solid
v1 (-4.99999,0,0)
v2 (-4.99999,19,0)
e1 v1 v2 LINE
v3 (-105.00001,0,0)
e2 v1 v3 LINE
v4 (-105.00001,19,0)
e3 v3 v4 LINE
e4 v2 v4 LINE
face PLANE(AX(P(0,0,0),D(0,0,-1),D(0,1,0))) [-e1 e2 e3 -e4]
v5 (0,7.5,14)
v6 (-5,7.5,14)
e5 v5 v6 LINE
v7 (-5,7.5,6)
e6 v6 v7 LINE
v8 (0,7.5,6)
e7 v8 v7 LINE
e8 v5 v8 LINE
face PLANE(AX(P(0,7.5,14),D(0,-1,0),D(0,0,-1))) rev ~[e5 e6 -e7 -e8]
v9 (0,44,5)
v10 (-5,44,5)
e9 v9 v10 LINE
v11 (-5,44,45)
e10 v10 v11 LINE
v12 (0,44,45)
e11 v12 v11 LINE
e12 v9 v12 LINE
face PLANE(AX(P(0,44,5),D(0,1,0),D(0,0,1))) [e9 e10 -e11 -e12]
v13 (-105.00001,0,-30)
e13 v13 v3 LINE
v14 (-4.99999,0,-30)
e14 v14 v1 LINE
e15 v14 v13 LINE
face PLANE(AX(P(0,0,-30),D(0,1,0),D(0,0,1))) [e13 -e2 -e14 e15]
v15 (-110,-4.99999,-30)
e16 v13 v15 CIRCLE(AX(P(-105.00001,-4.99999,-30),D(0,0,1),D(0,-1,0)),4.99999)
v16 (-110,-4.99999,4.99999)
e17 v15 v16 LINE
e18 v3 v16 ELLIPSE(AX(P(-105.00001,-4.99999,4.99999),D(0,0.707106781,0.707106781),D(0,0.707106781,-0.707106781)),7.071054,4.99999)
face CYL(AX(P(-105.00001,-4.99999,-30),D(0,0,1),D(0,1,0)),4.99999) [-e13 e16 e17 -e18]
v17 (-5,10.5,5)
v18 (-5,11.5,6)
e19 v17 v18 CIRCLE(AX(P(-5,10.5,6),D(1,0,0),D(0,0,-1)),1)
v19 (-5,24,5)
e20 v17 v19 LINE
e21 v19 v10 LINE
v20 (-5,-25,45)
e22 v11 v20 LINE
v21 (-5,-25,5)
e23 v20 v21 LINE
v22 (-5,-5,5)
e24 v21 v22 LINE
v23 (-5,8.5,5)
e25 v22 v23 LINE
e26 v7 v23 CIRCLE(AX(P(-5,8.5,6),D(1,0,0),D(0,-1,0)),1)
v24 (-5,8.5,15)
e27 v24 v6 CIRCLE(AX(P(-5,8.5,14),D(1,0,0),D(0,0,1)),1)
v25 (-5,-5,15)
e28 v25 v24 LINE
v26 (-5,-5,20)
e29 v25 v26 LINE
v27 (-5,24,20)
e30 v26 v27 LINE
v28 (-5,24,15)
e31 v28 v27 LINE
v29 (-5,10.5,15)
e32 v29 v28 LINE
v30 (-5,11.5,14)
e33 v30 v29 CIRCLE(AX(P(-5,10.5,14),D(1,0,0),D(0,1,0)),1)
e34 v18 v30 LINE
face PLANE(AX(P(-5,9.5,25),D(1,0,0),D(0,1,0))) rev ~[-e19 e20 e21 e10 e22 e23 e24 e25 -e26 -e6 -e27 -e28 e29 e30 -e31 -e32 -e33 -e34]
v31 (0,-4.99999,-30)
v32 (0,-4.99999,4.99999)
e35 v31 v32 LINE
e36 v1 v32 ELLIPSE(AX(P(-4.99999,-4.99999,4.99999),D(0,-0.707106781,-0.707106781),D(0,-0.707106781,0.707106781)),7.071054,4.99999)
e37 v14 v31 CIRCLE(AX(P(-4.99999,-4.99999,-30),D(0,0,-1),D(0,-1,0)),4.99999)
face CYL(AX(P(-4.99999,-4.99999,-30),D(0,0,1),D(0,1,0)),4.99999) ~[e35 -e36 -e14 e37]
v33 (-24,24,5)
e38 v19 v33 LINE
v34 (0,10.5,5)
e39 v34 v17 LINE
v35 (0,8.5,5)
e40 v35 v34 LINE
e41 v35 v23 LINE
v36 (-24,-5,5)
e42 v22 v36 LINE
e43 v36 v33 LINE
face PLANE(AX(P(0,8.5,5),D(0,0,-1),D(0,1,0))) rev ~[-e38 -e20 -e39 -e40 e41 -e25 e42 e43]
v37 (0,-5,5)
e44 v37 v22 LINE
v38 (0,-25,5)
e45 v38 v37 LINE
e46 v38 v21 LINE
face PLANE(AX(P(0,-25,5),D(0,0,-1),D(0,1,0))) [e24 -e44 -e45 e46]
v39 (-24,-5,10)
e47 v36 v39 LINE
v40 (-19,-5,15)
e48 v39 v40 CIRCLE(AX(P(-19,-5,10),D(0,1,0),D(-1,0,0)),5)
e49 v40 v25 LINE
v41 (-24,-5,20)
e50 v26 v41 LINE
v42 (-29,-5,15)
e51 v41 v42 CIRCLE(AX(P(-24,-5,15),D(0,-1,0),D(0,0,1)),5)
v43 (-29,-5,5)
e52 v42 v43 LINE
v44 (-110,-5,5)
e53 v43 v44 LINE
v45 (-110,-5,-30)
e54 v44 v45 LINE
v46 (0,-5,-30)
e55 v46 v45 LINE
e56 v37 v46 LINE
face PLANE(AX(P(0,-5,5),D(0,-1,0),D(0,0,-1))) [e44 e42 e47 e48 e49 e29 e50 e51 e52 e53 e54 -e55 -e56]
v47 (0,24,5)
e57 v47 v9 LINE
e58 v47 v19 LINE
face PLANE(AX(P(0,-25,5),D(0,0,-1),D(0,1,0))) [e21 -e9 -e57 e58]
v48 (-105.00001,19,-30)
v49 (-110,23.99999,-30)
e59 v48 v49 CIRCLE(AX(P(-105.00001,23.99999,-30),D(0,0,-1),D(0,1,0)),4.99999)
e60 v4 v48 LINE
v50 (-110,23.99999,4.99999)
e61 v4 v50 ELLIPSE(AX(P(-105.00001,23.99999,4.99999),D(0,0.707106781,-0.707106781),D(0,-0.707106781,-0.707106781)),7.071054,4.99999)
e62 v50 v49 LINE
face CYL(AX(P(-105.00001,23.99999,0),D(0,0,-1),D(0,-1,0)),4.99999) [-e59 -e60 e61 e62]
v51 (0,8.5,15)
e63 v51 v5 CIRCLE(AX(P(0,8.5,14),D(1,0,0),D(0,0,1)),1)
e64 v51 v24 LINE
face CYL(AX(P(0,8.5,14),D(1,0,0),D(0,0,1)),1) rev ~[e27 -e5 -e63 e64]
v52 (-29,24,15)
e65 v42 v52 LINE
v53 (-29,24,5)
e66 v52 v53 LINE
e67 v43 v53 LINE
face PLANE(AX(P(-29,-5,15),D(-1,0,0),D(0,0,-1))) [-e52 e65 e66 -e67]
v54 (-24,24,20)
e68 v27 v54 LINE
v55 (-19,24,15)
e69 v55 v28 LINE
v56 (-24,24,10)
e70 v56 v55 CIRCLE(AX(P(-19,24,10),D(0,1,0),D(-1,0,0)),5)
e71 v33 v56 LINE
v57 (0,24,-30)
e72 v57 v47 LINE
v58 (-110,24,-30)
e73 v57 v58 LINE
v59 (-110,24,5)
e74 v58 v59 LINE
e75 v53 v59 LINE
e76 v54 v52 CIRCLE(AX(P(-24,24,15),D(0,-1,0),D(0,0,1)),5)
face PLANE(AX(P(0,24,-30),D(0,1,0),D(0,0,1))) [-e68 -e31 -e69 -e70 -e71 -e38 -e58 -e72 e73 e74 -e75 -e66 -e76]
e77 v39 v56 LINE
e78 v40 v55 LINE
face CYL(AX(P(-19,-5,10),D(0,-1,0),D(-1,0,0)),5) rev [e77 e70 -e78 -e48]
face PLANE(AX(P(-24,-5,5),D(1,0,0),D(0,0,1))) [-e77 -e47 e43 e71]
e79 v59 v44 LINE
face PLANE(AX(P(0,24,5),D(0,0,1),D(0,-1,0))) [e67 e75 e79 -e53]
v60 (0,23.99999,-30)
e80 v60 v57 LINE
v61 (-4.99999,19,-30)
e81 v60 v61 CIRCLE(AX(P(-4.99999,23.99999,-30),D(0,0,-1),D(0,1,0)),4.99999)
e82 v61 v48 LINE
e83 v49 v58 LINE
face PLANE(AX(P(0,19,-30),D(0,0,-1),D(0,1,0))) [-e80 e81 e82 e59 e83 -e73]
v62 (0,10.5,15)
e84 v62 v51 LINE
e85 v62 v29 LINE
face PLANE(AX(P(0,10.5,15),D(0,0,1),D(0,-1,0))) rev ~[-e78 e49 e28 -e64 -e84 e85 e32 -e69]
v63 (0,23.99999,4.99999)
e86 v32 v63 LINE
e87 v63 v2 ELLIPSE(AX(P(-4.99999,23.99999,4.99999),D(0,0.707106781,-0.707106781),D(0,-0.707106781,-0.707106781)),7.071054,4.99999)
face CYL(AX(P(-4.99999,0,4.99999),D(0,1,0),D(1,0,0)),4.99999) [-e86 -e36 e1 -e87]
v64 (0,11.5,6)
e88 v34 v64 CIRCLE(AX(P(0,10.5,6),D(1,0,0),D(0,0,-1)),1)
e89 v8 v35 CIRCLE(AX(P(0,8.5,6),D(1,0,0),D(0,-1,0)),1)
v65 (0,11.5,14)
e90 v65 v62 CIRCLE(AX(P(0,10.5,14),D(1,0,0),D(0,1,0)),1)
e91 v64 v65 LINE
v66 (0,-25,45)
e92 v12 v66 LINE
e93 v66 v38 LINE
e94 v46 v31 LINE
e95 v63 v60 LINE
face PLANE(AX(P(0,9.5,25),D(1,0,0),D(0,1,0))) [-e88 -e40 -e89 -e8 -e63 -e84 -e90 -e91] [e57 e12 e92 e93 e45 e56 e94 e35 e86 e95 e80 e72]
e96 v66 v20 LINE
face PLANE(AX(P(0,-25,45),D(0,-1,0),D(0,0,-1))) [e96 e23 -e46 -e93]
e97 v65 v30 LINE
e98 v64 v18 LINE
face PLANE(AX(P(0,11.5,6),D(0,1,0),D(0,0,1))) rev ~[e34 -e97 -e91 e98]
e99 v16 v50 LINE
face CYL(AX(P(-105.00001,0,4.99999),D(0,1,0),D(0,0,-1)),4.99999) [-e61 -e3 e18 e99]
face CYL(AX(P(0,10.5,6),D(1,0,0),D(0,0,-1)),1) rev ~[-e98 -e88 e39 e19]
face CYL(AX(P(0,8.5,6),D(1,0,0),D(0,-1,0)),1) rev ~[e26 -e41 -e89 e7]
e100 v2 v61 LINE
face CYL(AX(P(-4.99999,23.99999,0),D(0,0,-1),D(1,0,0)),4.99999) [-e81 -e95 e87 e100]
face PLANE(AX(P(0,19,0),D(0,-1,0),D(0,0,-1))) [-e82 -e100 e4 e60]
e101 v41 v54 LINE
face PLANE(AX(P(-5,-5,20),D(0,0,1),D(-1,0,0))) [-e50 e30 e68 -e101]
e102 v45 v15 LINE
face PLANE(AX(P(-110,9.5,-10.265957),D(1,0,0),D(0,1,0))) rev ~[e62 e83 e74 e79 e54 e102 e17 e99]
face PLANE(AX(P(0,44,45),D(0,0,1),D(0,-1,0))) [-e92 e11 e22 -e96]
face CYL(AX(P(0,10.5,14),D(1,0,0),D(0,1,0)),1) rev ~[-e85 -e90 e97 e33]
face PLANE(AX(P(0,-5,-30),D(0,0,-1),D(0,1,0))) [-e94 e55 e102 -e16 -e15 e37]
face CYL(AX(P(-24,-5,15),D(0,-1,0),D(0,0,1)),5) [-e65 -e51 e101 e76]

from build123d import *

# Parameters (mm, degrees)
F1_DEPTH = 110
F3_DEPTH = 5
F5_DEPTH = 29
F7_DEPTH = 5
F8_R     = 4.99999
F9_R     = 4.99999


# Not quite as in the source:
# - a fillet or chamfer is up to 0.001 mm smaller than in the source, because OpenCascade refuses the exact size


with BuildPart() as f1:
    # F0 (on Right) → F1 (new body)
    with BuildSketch(Plane.YZ):
        Polygon((-5, -30), (0, -30), (0, 0), (19, 0), (19, -30), (24, -30), (24, 5), (-5, 5), align=None)
    extrude(amount=-F1_DEPTH)

    # F2 (on face) → F3 (join)
    with BuildSketch(Plane.YZ):
        Polygon((-25, 5), (-5, 5), (24, 5), (44, 5), (44, 45), (-25, 45), align=None)
    extrude(amount=-F3_DEPTH)

    # F4 (on face) → F5 (join, through all)
    with BuildSketch(Plane.XZ.offset(5)):
        with BuildLine():
            Line((-19, 15), (-5, 15))
            Line((-5, 15), (-5, 20))
            Line((-5, 20), (-24, 20))
            ThreePointArc((-24, 20), (-27.5355339059, 18.5355339059), (-29, 15))
            Line((-29, 15), (-29, 5))
            Line((-29, 5), (-24, 5))
            Line((-24, 5), (-24, 10))
            ThreePointArc((-24, 10), (-22.5355339059, 13.5355339059), (-19, 15))
        make_face()
    extrude(amount=-F5_DEPTH)

    # F6 (on face) → F7 (cut, through all)
    with BuildSketch(Plane.YZ):
        with BuildLine():
            Line((8.5, 5), (9.5, 5))
            Line((9.5, 5), (10.5, 5))
            ThreePointArc((10.5, 5), (11.2071067812, 5.2928932188), (11.5, 6))
            Line((11.5, 6), (11.5, 14))
            ThreePointArc((11.5, 14), (11.2071067812, 14.7071067812), (10.5, 15))
            Line((10.5, 15), (8.5, 15))
            ThreePointArc((8.5, 15), (7.7928932188, 14.7071067812), (7.5, 14))
            Line((7.5, 14), (7.5, 6))
            ThreePointArc((7.5, 6), (7.7928932188, 5.2928932188), (8.5, 5))
        make_face()
    extrude(amount=-F7_DEPTH, mode=Mode.SUBTRACT)

    # F8 (radius 5 in the source; OpenCascade refuses exactly that, so slightly less here)
    f8_edges = [f1.edges().sort_by_distance(p)[0] for p in [
        (-110, 19, -15),
        (-110, 9.5, 0),
        (-110, 0, -15),
    ]]
    fillet(f8_edges, radius=F8_R)

    # F9 (radius 5 in the source; OpenCascade refuses exactly that, so slightly less here)
    f9_edges = [f1.edges().sort_by_distance(p)[0] for p in [
        (0, 0, -15),
        (0, 19, -15),
        (0, 9.5, 0),
    ]]
    fillet(f9_edges, radius=F9_R)


solid = f1.part
